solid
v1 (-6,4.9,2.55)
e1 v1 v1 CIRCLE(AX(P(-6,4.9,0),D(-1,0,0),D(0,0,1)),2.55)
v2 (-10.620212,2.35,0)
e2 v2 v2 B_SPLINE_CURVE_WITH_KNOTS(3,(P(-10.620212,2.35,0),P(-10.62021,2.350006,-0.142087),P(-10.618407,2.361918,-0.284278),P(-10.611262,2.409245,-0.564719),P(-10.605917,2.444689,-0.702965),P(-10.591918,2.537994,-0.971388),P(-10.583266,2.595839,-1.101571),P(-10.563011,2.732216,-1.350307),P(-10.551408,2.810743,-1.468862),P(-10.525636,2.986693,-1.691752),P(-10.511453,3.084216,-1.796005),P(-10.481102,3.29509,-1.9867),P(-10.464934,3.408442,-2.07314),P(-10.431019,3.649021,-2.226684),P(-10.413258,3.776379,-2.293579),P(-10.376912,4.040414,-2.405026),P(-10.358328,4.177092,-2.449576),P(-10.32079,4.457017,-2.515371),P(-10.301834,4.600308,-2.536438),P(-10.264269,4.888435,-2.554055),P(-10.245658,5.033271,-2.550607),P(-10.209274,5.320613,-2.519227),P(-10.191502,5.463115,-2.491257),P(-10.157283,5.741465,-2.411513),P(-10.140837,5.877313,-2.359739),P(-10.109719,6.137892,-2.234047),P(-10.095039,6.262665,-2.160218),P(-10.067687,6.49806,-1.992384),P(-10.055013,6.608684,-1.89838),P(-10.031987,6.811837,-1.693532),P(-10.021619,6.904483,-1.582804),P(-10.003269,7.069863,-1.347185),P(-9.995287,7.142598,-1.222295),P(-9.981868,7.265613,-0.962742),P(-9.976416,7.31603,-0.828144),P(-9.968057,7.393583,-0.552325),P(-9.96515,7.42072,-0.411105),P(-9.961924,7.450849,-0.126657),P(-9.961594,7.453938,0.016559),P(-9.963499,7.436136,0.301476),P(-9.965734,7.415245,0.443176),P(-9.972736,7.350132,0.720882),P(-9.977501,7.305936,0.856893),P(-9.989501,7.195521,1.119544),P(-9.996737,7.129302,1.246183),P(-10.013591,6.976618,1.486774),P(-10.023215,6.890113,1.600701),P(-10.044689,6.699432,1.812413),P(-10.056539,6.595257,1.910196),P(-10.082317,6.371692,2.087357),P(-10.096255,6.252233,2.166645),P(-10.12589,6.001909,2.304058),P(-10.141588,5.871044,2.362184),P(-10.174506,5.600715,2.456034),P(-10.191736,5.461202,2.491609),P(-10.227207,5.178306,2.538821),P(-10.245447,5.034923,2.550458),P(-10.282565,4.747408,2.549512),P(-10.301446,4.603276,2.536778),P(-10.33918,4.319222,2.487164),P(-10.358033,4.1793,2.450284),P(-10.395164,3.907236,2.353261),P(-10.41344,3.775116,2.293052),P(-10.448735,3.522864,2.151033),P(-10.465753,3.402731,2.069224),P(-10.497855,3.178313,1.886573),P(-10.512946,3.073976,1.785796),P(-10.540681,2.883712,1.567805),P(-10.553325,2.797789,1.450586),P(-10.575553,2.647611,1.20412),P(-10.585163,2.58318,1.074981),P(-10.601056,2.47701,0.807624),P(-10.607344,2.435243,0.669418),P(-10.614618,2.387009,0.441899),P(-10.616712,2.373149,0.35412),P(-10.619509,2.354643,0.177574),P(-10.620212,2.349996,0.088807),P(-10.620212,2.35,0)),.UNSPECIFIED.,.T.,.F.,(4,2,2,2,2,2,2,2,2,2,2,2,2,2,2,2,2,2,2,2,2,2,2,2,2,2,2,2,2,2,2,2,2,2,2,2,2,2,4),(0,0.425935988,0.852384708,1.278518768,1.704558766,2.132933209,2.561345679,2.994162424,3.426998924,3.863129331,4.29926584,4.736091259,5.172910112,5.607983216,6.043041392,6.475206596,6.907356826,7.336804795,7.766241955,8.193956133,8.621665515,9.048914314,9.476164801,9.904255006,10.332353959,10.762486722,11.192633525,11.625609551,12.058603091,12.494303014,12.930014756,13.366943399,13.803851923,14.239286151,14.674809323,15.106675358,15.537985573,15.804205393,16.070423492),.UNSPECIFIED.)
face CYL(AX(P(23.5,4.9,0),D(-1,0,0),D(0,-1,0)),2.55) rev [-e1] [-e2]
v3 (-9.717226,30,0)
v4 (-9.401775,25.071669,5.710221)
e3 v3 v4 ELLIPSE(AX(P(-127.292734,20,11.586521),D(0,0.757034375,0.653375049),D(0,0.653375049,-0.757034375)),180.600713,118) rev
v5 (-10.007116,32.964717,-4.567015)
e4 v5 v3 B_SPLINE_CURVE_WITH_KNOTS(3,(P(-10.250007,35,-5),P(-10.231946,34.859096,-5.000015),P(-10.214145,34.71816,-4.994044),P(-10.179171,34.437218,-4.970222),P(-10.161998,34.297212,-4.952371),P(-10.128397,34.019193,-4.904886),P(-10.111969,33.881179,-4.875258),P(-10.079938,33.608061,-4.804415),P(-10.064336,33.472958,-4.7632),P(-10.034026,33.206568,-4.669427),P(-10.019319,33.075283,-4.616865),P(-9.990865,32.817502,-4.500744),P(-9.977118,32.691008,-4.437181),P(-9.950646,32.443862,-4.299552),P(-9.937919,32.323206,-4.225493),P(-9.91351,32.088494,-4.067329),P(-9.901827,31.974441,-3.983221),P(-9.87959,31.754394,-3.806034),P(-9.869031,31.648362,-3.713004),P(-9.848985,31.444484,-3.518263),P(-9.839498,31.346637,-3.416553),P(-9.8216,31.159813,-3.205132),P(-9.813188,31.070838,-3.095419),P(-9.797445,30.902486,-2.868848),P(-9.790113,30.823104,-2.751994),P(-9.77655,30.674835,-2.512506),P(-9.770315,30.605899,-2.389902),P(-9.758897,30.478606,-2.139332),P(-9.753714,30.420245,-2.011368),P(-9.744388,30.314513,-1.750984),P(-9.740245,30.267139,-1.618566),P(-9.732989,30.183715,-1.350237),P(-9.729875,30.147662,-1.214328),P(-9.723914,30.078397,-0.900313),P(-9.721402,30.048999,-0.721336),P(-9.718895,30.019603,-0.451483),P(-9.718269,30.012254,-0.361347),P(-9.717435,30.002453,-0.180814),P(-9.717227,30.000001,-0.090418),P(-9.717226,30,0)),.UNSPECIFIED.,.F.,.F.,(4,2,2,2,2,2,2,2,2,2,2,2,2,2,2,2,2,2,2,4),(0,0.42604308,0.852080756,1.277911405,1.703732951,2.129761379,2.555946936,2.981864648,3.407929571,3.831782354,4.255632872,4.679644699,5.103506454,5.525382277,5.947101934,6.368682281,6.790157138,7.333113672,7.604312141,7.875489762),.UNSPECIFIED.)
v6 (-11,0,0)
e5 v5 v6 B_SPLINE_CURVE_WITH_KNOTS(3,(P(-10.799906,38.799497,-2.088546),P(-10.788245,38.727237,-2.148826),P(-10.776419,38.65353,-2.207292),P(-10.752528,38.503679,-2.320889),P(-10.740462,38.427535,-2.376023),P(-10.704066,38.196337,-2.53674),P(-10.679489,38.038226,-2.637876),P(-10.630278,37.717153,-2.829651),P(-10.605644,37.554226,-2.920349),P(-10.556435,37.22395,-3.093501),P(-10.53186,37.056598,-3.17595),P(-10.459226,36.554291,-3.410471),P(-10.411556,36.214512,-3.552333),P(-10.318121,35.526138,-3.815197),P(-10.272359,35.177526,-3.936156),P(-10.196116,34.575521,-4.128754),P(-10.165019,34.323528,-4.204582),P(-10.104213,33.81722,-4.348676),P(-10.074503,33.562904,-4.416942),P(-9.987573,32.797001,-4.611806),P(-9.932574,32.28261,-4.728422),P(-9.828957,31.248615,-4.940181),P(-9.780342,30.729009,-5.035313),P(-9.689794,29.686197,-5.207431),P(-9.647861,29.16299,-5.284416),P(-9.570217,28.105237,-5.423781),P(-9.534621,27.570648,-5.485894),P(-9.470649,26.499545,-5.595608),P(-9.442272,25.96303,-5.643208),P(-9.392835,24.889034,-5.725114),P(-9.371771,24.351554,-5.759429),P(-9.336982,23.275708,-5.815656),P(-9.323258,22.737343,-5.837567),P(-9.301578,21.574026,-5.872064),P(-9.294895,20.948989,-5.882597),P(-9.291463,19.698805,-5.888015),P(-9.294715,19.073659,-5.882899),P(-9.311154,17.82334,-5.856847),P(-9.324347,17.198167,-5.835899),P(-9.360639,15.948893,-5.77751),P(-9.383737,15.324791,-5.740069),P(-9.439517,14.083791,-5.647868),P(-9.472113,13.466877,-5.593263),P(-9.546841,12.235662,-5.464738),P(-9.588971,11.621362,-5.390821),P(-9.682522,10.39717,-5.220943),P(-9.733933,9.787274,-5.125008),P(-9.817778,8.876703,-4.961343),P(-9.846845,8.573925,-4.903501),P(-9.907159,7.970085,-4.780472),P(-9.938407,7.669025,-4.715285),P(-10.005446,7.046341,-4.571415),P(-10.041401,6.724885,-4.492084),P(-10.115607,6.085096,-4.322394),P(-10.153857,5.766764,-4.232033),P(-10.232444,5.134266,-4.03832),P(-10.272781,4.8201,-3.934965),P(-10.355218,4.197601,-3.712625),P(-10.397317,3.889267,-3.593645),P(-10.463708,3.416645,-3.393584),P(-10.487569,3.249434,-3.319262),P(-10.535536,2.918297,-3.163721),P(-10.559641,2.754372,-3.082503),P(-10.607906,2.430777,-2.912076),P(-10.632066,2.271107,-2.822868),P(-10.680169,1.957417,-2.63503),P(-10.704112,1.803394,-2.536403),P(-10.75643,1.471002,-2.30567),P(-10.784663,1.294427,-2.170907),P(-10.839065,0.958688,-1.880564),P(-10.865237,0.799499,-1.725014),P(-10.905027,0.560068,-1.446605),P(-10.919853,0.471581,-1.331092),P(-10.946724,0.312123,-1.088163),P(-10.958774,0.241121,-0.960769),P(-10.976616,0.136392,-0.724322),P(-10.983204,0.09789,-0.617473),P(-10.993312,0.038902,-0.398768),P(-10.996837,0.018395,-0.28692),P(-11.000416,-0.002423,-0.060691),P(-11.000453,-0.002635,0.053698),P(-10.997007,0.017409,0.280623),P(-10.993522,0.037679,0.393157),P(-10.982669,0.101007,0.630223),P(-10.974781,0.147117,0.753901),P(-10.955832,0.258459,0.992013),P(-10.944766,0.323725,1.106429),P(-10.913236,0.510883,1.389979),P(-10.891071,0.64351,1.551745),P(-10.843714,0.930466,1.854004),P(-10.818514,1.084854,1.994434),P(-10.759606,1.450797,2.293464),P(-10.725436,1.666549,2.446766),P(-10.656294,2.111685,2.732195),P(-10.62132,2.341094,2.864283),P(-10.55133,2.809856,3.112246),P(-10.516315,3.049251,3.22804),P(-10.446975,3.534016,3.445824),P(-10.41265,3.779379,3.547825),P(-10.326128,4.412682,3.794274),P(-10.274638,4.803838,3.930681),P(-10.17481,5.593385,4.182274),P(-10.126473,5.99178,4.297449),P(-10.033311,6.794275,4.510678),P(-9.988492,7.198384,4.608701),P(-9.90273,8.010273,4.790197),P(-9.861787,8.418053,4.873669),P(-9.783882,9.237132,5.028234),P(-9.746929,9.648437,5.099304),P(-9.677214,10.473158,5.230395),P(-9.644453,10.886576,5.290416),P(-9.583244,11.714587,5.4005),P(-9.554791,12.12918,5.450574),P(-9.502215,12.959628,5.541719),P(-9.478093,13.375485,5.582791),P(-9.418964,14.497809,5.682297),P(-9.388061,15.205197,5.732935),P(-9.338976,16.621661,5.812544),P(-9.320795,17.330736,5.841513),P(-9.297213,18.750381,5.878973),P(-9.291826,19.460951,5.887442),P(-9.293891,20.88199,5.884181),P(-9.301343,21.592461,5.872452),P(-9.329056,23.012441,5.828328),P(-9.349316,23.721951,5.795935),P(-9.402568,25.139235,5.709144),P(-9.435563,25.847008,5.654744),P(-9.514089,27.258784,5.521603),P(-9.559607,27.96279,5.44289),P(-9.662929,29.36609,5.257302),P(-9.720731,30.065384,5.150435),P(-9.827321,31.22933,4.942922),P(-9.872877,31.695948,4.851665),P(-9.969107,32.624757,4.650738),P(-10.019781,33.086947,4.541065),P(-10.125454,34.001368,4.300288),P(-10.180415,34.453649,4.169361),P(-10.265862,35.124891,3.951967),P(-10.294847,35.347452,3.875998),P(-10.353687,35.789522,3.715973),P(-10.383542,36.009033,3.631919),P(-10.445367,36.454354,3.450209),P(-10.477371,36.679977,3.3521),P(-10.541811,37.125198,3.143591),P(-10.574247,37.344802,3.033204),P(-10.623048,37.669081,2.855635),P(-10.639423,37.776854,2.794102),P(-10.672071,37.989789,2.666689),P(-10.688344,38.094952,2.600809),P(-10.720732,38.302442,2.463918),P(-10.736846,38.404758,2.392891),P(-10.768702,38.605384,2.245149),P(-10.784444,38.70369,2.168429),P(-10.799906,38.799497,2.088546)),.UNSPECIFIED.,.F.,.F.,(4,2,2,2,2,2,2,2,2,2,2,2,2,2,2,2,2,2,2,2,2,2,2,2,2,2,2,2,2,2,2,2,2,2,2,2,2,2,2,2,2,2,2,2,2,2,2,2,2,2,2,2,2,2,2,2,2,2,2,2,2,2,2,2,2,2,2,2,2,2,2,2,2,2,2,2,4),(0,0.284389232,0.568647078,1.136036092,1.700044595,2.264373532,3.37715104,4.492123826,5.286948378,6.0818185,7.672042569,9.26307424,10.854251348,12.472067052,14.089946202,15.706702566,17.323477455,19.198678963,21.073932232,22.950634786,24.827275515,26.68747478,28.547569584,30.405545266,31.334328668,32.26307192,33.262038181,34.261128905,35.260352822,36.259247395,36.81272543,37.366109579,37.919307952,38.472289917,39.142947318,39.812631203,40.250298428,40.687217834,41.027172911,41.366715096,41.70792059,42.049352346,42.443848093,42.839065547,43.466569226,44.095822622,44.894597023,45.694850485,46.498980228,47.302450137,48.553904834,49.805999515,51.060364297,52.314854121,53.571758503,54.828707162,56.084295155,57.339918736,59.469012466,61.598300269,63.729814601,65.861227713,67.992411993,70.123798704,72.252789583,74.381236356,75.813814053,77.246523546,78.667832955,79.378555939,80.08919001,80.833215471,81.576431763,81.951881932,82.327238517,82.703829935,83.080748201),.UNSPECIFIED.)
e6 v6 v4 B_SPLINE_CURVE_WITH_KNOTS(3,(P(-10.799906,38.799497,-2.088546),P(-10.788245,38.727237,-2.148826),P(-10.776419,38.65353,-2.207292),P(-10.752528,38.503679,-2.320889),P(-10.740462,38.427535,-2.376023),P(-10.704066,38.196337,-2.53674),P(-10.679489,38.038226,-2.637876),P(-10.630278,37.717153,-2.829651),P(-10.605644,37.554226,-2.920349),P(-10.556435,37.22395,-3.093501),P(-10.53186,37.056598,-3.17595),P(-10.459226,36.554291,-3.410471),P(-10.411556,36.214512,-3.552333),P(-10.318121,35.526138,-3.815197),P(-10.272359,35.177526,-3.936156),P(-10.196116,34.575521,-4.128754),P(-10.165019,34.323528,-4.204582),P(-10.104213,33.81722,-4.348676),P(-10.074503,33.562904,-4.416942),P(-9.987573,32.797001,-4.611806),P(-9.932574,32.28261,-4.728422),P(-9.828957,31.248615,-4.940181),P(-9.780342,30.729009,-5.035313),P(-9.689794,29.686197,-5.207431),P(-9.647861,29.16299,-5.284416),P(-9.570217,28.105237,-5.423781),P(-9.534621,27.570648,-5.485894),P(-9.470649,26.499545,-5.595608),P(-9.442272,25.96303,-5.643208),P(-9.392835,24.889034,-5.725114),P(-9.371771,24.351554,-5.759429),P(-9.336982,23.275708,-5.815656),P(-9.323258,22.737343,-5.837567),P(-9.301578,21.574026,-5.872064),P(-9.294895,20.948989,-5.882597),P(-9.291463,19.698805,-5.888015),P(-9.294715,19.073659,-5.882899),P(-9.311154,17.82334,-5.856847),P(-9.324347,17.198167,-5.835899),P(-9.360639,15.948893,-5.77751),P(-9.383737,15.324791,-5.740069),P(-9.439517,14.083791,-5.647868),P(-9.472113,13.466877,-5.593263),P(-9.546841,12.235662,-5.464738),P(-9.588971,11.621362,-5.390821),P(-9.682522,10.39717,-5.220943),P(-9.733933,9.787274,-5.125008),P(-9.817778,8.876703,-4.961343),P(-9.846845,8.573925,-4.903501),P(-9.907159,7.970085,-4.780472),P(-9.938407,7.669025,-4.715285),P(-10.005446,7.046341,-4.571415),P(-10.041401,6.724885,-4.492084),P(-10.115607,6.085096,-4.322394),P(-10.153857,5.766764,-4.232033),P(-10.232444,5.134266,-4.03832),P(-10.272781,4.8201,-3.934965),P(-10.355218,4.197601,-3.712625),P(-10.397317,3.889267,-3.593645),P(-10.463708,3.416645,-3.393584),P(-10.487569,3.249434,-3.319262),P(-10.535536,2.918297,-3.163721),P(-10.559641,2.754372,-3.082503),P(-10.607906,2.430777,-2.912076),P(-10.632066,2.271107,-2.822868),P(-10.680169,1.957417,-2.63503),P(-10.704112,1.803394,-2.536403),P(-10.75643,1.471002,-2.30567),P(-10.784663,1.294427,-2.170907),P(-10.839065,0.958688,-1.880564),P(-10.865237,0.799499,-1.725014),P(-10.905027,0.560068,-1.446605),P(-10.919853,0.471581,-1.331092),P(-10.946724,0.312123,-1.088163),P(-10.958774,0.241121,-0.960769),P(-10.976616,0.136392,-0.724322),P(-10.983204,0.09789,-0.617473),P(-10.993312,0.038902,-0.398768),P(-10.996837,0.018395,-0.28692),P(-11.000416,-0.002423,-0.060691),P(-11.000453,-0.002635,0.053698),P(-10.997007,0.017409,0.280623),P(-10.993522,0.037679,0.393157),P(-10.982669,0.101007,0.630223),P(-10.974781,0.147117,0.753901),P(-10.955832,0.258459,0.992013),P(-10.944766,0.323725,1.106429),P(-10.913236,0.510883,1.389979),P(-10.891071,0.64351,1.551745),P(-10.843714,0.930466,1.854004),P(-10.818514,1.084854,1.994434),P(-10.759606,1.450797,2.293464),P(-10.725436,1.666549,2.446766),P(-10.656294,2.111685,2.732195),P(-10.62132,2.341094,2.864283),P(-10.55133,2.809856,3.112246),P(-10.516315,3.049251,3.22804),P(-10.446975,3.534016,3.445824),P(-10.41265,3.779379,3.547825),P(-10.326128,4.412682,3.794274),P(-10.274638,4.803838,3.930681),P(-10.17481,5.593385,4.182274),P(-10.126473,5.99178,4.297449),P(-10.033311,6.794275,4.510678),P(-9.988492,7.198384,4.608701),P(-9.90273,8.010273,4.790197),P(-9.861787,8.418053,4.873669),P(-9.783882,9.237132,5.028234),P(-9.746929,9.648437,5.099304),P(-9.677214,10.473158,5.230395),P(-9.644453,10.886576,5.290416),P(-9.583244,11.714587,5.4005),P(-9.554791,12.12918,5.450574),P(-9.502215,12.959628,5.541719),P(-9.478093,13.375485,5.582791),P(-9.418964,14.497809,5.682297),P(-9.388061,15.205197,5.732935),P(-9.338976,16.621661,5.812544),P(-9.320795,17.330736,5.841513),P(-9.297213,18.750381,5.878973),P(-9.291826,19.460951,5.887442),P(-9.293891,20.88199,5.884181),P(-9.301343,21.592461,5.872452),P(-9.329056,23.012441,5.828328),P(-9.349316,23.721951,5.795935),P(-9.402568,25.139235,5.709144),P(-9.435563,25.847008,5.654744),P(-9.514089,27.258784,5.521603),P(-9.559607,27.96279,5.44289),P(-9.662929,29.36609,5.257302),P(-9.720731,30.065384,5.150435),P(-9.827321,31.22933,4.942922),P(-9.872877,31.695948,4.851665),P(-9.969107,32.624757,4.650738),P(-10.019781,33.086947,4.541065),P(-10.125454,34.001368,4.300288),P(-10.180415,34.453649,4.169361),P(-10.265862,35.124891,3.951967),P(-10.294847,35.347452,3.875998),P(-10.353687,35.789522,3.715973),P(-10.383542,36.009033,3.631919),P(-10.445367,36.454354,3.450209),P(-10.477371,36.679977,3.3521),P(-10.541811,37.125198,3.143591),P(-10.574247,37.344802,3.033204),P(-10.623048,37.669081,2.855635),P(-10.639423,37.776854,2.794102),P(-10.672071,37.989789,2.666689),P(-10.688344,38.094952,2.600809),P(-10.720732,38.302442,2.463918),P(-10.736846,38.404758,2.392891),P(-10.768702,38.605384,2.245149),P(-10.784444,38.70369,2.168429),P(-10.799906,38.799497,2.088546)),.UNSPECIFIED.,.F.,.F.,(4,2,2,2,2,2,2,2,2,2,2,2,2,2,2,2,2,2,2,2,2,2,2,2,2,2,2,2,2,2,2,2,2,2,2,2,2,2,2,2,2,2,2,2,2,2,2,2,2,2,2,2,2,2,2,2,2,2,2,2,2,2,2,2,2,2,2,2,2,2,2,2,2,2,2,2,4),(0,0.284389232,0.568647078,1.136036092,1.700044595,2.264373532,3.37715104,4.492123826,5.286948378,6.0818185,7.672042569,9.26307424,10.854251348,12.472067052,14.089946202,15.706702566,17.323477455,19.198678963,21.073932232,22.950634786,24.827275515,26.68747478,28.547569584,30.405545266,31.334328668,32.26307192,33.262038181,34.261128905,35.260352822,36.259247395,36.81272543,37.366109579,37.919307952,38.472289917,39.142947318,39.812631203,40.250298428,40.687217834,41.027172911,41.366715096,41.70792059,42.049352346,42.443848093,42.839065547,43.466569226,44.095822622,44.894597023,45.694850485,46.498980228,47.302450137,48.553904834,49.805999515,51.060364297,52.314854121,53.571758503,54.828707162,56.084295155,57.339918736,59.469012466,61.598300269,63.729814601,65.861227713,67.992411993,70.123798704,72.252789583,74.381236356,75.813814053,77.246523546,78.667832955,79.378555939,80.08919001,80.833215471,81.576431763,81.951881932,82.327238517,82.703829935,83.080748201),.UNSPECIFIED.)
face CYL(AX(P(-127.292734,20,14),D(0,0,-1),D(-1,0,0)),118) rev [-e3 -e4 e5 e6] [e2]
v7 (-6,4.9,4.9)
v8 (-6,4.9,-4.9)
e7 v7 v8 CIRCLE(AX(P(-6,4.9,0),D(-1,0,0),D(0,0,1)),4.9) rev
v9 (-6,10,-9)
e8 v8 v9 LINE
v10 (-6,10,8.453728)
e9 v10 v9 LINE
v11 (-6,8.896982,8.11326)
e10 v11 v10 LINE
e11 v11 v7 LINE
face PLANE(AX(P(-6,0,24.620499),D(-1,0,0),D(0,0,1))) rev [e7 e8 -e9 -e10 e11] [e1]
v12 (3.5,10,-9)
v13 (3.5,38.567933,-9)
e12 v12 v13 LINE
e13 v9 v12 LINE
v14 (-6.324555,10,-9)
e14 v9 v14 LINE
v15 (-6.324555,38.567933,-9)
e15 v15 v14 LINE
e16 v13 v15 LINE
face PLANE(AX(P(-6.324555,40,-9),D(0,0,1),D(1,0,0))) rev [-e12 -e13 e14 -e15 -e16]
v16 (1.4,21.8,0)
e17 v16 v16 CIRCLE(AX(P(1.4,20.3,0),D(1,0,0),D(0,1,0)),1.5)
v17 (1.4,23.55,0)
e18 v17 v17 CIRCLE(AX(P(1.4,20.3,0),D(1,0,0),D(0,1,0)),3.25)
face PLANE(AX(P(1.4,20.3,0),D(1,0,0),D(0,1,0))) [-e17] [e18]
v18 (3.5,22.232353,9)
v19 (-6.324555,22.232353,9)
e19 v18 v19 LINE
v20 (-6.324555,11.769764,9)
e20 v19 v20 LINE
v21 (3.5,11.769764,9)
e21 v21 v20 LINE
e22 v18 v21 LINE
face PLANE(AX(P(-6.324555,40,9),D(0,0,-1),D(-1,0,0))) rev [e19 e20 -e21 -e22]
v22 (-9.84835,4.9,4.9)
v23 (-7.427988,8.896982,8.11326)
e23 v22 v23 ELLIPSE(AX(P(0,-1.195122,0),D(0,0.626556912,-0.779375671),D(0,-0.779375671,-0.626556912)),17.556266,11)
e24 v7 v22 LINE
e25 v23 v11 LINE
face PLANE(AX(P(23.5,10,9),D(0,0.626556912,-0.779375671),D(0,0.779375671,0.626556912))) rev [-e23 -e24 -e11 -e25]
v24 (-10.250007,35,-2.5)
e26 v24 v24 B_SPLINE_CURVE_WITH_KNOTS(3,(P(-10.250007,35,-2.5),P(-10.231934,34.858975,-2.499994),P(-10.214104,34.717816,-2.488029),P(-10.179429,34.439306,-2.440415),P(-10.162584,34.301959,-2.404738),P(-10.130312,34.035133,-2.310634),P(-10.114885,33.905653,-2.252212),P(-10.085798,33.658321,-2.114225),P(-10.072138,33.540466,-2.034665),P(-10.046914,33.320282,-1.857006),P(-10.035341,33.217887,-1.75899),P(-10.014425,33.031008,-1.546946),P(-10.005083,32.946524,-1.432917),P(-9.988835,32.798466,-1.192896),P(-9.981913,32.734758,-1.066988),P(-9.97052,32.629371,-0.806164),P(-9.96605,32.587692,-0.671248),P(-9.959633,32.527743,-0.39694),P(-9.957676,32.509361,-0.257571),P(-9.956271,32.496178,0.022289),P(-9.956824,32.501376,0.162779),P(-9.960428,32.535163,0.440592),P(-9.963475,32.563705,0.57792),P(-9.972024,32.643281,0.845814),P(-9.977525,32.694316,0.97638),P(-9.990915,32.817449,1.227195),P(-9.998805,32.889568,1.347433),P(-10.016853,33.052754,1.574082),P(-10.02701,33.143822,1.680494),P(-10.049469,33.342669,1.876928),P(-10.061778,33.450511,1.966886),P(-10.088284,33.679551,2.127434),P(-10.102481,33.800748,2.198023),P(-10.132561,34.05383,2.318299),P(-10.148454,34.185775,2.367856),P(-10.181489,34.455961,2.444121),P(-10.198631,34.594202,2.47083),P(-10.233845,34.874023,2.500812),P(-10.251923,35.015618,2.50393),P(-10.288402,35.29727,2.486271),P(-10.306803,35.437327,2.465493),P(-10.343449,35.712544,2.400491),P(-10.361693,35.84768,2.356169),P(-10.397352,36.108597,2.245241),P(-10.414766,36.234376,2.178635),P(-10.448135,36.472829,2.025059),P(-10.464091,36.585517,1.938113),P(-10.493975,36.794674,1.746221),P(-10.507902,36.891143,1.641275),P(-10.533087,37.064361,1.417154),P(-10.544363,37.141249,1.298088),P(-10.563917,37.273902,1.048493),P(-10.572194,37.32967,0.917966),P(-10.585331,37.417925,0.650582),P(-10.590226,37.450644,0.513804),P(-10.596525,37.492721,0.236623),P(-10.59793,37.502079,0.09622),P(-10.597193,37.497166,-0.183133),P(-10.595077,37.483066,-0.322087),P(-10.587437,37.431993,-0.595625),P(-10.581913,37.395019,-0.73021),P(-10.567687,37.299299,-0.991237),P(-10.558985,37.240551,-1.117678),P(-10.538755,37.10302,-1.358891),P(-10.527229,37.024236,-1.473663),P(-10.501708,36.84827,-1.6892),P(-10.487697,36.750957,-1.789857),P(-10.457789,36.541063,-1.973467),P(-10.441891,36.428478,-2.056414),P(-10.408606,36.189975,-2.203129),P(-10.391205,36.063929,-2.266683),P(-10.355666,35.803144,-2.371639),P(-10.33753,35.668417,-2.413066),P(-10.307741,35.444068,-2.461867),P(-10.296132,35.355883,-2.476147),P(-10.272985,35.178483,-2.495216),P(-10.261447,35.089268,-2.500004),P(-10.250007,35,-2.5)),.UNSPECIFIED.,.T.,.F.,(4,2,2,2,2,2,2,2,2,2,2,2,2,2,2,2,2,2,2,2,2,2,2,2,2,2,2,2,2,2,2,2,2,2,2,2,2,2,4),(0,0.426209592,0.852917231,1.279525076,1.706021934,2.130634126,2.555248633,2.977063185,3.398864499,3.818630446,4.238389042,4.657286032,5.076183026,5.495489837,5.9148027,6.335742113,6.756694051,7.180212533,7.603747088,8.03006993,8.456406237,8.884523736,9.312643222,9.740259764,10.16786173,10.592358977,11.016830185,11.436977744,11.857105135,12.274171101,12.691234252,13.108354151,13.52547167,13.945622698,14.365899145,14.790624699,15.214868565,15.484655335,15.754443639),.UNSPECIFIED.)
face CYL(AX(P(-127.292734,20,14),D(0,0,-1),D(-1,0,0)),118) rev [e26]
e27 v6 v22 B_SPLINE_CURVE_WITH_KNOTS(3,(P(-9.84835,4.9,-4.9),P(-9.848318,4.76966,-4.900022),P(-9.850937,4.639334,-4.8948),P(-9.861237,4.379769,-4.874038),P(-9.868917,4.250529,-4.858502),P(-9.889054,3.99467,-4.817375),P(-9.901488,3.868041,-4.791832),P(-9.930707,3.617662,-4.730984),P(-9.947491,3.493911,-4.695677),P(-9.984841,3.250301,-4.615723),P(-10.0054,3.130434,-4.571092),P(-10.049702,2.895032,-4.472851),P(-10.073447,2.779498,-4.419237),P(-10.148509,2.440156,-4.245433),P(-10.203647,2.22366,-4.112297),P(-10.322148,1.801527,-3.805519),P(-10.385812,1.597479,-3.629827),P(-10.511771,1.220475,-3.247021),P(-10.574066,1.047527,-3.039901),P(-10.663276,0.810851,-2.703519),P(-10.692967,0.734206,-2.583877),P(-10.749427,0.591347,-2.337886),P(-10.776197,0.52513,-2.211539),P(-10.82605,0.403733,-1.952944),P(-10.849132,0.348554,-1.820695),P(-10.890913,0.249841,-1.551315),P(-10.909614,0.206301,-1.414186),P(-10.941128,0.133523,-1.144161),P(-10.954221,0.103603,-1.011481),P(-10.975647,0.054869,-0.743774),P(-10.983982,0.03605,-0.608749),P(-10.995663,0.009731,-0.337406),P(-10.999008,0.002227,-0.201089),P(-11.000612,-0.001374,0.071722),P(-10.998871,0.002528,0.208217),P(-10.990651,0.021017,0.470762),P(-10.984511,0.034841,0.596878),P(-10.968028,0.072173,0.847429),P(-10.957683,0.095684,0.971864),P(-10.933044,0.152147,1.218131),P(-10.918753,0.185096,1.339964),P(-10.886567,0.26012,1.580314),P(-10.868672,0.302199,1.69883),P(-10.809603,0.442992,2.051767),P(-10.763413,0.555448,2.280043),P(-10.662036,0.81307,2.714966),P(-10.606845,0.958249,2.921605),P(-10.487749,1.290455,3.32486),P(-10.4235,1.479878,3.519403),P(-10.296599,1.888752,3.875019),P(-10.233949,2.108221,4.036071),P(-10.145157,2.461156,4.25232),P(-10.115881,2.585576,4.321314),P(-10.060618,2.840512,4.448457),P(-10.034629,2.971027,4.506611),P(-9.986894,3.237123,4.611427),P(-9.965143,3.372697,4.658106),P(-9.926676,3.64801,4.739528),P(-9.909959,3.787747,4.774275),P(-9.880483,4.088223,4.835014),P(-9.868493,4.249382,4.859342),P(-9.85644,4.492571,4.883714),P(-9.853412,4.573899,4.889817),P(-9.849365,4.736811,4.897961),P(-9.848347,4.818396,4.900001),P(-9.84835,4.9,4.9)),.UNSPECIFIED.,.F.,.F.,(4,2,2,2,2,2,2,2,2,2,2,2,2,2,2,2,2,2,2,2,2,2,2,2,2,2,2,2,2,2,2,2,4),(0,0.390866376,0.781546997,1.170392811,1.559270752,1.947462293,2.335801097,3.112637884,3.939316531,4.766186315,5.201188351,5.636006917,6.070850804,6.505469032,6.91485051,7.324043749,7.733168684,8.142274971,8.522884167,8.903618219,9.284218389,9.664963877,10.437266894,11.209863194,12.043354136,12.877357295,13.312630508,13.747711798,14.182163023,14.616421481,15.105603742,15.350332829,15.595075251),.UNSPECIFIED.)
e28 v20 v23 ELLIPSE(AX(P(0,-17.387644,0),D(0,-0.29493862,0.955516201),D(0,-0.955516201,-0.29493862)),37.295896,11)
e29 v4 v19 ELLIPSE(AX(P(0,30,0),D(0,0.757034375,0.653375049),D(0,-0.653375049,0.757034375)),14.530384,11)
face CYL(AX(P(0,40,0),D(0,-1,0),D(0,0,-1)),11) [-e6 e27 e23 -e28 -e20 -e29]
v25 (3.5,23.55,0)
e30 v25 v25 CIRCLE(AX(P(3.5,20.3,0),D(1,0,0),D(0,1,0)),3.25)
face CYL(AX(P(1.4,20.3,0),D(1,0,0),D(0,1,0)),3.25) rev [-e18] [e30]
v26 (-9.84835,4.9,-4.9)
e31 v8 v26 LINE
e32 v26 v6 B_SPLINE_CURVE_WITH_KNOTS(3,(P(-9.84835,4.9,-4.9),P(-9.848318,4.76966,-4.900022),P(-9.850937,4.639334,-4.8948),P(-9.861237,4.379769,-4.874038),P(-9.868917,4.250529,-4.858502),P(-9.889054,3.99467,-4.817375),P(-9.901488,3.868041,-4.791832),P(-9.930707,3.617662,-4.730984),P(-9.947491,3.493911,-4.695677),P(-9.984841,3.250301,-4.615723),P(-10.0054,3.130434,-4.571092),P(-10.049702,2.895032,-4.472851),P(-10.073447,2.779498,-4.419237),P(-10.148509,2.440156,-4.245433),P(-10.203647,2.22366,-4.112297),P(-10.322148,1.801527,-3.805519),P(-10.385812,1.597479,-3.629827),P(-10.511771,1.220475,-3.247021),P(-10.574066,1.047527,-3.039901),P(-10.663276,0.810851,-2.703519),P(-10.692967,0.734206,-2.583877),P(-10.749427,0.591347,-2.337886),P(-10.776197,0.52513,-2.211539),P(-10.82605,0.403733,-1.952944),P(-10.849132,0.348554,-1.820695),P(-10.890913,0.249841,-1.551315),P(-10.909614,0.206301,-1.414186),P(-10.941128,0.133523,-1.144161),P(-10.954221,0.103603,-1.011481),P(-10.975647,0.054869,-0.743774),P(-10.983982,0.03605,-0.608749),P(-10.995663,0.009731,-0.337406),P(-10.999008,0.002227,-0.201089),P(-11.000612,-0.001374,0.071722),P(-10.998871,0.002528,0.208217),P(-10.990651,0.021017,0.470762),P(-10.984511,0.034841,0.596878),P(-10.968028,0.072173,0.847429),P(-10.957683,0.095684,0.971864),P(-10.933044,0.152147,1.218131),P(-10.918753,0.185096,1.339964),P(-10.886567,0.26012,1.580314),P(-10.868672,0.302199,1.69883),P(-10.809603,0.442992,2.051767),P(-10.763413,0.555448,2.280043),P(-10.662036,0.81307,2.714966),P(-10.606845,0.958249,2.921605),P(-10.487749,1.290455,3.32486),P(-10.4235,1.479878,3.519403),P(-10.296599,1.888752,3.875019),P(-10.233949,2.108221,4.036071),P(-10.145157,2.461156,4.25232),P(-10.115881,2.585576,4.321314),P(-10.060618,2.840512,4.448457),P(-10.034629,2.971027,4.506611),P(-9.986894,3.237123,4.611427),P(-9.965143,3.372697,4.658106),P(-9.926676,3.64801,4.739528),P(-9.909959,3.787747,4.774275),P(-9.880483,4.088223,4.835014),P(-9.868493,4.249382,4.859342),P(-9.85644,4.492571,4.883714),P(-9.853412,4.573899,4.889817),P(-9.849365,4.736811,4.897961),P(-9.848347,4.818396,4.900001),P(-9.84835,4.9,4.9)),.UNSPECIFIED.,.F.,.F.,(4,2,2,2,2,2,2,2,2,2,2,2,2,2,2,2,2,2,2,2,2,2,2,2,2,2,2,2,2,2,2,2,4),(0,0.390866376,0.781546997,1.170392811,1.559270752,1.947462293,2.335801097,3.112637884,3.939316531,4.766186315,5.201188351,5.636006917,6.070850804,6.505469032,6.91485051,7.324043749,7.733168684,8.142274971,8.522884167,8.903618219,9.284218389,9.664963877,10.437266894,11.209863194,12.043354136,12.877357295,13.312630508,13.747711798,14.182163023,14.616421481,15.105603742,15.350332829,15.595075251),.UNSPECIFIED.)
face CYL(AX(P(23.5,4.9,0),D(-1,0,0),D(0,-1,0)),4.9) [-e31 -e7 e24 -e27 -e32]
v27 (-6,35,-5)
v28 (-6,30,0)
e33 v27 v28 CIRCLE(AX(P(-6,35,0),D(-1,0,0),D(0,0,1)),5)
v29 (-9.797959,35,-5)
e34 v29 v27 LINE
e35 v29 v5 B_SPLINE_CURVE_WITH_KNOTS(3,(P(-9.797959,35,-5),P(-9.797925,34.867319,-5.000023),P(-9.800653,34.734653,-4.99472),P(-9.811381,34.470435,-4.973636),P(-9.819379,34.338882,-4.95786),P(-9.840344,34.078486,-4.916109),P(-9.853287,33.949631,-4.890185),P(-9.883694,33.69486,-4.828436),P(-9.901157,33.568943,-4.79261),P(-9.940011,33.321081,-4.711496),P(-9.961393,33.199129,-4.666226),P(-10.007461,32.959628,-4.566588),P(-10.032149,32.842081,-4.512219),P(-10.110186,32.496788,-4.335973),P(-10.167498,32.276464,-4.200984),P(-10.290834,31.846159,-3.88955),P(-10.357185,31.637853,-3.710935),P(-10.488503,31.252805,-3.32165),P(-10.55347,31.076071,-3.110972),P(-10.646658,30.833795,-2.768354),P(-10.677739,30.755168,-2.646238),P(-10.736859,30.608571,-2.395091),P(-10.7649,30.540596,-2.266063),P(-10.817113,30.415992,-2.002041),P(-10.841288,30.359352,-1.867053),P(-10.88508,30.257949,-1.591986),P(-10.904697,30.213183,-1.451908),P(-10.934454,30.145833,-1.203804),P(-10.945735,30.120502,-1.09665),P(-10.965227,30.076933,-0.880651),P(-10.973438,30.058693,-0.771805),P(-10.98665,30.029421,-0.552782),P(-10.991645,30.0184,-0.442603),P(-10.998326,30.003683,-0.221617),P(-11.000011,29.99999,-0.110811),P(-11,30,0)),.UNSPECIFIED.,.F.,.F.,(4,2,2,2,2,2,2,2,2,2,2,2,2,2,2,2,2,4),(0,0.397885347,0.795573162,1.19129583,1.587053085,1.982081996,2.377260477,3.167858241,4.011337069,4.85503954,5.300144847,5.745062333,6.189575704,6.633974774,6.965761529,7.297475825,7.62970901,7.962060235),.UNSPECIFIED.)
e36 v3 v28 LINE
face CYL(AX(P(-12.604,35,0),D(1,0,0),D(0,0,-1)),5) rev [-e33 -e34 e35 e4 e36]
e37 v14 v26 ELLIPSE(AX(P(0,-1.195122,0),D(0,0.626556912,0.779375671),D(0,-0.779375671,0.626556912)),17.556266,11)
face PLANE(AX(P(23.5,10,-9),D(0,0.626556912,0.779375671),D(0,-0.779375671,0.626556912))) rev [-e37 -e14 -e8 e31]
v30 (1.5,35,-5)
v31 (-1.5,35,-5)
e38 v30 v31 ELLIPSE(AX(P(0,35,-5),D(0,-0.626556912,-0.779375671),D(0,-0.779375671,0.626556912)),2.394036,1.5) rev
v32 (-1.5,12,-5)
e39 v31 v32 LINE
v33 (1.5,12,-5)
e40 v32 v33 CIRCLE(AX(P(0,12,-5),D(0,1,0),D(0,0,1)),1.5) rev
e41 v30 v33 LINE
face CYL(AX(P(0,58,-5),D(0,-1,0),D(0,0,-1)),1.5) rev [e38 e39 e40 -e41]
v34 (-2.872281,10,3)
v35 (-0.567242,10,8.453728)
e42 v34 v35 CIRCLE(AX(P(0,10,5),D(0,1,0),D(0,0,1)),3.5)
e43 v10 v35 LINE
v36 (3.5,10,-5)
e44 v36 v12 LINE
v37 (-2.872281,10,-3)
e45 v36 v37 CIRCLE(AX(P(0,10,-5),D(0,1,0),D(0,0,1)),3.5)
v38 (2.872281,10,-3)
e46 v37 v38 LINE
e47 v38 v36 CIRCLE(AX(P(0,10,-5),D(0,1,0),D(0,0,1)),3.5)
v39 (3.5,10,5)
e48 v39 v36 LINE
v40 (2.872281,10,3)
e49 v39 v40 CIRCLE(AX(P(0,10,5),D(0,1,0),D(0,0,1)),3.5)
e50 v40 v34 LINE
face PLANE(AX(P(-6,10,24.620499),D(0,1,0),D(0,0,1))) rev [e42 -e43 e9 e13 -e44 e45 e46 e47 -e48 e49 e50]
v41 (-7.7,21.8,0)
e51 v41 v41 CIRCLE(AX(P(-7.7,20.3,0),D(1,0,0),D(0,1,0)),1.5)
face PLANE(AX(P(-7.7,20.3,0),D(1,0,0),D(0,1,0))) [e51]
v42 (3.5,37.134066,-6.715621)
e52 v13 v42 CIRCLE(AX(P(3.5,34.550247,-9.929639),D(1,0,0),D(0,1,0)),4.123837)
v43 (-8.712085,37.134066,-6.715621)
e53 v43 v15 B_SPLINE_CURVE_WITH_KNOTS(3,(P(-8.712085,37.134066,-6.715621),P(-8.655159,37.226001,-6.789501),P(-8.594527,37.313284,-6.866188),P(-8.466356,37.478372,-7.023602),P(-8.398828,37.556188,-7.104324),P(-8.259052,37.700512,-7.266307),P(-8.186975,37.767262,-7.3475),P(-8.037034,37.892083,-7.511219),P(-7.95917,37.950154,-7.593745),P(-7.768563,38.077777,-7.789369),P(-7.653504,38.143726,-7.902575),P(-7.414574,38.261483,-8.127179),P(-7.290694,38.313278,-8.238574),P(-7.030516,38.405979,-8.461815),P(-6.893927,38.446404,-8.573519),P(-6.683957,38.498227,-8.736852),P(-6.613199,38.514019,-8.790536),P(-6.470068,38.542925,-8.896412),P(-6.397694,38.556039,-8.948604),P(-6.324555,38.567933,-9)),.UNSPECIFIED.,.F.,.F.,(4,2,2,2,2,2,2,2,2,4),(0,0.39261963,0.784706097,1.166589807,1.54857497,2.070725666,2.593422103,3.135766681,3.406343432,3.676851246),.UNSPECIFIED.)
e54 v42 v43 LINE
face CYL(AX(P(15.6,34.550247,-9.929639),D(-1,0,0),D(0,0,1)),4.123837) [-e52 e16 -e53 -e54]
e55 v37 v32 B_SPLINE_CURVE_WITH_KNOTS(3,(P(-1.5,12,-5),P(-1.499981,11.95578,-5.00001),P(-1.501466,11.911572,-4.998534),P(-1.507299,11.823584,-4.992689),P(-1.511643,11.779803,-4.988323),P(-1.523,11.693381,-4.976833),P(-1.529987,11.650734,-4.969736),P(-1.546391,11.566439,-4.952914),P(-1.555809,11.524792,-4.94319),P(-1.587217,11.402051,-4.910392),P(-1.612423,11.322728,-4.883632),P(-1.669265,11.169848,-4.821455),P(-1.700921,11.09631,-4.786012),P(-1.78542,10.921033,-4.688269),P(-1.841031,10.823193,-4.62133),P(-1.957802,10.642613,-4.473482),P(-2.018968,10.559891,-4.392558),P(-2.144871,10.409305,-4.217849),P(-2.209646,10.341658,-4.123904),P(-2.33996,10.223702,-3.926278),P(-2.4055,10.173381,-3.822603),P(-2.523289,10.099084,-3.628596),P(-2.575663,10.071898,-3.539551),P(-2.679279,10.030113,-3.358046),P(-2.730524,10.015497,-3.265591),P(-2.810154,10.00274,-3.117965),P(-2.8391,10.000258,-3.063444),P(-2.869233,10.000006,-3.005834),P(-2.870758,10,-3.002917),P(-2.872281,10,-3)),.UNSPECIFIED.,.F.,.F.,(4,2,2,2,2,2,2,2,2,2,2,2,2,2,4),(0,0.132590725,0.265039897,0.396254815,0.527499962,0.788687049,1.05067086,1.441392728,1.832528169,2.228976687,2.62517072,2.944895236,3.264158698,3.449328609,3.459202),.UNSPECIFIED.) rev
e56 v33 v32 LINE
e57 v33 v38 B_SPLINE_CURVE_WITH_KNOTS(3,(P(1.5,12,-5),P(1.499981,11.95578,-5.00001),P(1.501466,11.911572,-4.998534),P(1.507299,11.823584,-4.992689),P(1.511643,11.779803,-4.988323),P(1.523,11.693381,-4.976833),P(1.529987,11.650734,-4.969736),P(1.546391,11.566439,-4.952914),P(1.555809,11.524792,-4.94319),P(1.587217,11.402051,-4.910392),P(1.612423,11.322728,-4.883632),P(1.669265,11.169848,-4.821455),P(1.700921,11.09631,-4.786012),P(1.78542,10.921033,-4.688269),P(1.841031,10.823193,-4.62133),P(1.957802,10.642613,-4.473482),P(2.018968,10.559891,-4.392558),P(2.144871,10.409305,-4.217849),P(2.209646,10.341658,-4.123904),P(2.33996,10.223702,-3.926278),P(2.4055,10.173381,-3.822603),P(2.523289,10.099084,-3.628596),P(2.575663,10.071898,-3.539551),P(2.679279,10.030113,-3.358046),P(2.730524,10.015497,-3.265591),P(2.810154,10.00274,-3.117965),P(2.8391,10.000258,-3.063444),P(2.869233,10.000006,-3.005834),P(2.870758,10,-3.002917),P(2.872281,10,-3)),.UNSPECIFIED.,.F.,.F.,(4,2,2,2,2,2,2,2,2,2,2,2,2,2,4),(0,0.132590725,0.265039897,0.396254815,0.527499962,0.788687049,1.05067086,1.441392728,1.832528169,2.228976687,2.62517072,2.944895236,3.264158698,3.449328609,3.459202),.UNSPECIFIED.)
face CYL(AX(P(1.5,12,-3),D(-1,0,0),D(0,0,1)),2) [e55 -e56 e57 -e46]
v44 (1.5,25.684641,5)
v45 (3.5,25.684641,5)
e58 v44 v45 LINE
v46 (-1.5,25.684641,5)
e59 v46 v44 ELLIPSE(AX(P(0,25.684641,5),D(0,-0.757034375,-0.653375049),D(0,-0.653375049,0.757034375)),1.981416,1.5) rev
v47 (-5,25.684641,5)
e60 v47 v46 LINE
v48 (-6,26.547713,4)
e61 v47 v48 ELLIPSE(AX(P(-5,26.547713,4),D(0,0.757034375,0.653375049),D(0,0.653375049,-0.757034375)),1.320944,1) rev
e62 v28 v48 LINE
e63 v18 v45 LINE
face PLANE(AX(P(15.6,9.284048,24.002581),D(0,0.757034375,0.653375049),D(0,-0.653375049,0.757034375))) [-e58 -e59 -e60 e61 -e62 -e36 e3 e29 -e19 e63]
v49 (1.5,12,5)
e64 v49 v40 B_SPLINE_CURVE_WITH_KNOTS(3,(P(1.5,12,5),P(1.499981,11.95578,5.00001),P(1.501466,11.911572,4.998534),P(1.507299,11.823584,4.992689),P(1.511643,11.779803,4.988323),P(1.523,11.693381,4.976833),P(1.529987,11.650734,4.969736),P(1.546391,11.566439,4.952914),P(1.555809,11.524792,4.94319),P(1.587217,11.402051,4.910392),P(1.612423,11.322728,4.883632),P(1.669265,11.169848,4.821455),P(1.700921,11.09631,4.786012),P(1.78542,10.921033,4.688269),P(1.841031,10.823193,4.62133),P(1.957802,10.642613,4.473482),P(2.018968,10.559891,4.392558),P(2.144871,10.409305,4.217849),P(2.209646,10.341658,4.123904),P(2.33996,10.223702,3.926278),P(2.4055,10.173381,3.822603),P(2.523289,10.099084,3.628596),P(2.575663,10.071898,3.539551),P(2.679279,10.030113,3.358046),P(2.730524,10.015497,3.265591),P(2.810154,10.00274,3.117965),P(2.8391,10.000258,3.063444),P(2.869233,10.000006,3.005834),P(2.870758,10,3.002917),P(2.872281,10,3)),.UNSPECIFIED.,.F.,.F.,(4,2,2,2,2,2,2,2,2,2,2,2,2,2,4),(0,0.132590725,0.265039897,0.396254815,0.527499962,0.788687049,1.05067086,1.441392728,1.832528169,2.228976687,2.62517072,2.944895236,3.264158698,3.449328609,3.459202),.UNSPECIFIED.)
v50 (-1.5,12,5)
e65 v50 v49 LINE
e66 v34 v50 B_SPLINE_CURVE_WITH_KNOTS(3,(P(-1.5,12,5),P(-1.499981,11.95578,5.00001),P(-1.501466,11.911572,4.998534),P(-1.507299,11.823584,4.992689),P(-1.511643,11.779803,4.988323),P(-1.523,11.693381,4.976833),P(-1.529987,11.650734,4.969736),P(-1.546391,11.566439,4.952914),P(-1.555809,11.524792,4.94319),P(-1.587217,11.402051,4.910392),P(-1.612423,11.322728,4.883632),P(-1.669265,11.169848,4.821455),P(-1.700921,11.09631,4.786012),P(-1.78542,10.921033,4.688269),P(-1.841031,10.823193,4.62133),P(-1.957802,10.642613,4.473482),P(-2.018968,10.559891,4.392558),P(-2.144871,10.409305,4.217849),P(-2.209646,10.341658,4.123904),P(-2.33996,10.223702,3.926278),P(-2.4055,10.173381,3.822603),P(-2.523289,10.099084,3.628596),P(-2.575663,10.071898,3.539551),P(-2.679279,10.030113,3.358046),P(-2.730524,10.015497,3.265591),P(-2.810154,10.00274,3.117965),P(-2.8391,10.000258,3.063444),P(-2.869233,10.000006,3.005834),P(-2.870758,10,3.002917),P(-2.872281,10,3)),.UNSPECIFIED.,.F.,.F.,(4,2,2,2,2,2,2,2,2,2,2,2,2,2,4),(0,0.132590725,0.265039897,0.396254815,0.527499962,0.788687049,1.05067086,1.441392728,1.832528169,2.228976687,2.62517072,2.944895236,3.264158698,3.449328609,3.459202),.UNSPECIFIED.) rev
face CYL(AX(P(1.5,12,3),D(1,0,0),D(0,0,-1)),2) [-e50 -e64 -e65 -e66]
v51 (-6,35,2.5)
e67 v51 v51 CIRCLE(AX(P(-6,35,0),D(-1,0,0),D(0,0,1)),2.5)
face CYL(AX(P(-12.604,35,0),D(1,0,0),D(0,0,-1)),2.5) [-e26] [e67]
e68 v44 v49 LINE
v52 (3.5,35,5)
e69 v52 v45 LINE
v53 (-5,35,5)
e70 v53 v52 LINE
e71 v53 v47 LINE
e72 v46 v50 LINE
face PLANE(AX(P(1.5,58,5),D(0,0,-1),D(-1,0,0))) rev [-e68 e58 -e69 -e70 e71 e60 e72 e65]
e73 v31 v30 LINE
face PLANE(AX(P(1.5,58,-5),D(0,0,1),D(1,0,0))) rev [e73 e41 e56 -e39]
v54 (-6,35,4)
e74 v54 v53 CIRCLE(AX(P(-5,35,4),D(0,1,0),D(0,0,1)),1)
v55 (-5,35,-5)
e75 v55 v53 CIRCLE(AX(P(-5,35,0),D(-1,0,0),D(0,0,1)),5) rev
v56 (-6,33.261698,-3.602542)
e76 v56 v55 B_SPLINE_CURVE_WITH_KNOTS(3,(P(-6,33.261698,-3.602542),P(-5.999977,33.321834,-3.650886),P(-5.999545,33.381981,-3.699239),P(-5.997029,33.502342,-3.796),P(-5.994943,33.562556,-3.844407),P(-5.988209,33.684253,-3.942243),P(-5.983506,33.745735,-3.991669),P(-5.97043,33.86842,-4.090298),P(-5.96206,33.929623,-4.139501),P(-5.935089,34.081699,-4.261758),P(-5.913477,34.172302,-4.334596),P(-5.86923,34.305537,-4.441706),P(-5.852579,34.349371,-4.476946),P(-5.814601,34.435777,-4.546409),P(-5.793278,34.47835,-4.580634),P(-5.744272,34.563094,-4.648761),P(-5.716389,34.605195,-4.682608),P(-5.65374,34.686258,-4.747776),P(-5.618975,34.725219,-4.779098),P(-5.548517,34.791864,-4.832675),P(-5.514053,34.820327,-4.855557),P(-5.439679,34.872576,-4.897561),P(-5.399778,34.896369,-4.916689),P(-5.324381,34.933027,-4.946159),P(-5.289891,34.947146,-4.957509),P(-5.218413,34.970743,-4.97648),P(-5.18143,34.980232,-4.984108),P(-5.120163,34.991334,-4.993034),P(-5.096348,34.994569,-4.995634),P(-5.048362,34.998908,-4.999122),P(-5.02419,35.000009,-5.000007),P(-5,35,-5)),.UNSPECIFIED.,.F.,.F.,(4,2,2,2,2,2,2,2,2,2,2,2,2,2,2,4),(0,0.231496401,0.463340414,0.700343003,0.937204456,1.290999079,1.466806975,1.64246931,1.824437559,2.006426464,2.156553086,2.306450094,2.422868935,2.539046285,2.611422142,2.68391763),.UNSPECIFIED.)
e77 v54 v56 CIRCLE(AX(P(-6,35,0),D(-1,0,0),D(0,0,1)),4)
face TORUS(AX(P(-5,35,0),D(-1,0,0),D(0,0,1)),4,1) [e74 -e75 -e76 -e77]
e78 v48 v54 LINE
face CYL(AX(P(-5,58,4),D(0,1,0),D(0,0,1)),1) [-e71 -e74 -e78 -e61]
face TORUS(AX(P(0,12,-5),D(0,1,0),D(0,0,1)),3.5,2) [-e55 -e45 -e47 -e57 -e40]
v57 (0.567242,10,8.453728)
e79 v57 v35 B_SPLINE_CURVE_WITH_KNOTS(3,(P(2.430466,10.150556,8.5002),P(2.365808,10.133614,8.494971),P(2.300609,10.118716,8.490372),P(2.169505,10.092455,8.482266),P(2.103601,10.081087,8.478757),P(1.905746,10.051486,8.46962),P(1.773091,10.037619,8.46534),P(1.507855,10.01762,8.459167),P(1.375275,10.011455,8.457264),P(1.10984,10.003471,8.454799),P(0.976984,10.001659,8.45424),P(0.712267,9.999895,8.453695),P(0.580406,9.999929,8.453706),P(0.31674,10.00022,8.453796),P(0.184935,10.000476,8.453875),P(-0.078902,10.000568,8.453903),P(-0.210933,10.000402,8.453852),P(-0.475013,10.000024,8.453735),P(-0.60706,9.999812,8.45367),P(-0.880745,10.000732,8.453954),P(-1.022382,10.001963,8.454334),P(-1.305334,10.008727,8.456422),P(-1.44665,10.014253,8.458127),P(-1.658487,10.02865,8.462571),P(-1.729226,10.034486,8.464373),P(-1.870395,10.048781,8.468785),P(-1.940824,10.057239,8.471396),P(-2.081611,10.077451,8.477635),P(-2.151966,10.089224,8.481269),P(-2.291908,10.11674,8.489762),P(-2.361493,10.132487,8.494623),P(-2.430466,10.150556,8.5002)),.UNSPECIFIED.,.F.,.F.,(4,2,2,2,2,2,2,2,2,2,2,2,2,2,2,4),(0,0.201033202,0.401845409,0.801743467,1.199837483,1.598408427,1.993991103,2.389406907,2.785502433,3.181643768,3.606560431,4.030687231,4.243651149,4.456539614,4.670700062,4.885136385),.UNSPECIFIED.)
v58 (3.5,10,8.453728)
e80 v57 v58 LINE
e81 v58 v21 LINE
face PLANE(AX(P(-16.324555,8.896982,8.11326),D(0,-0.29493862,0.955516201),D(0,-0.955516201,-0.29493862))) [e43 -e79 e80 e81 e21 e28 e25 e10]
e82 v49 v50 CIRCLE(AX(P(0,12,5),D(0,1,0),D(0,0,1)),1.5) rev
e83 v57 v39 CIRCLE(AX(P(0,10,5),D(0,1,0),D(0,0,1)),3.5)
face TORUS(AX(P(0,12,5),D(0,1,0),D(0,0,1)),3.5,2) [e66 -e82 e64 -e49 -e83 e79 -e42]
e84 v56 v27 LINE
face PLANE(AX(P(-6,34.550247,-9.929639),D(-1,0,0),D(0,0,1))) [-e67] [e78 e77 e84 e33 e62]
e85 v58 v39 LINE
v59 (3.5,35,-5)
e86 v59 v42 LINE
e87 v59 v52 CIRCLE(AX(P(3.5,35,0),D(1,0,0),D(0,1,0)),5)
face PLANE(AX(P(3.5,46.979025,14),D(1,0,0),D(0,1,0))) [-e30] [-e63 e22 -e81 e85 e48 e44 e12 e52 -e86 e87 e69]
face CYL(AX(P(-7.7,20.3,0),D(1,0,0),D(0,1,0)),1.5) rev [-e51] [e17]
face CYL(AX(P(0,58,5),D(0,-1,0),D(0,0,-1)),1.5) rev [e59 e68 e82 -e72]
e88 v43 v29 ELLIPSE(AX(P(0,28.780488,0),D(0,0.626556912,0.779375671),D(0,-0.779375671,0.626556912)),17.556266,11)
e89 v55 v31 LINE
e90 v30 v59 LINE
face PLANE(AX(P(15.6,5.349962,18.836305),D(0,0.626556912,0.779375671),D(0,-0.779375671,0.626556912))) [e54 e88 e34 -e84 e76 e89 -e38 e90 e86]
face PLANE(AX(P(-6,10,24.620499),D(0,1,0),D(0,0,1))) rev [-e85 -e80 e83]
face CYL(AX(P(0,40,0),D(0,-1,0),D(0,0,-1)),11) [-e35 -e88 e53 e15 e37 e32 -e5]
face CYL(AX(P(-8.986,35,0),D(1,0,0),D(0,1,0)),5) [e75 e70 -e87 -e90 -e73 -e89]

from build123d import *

# Parameters (mm, degrees)
BOSS_EXTRUDE1_DEPTH      = 40
CUT_EXTRUDE1_DEPTH       = 58
CUT_EXTRUDE2_REACH       = 47.222
SKETCH3_W                = 12
SKETCH3_H                = 10
SKETCH4_R                = 2.55
CUT_EXTRUDE3_DEPTH       = 17.5
FILLET4_R                = 2
CUT_EXTRUDE5_START       = -12.324555
SKETCH6_R                = 2.5
CUT_EXTRUDE5_DEPTH       = 9.6
CUT_EXTRUDE6_START       = 6.279445
SKETCH6_3_R              = 2.5
CUT_EXTRUDE6_DEPTH       = 6.604
CUT_EXTRUDE7_START       = -14.986
CUT_EXTRUDE7_DEPTH       = 14.986
CUT_EXTRUDE14_DEPTH      = 10
CUT_EXTRUDE14_DEPTH_BACK = 20
FILLET3_R                = 1
CUT_EXTRUDE17_DEPTH      = 9
CUT_EXTRUDE17_DEPTH_BACK = 31
SKETCH19_W               = 18.14397799
SKETCH19_H               = 52.511082079
SKETCH20_R               = 3.25
CUT_EXTRUDE18_DEPTH      = 2.1
SKETCH21_R               = 1.5
CUT_EXTRUDE19_DEPTH      = 9.1
CUT_EXTRUDE20_DEPTH      = 14
CUT_EXTRUDE20_DEPTH_BACK = 14


with BuildPart() as part:
    # Sketch1 → Boss-Extrude1 (new body)
    with BuildSketch(Plane(origin=(0, 0, 0), x_dir=(1, 0, 0), z_dir=(0, 1, 0))):
        with BuildLine():
            Line((-6.32455532, 9), (6.32455532, 9))
            ThreePointArc((6.32455532, 9), (11, 0), (6.32455532, -9))
            Line((6.32455532, -9), (-6.32455532, -9))
            ThreePointArc((-6.32455532, -9), (-11, 0), (-6.32455532, 9))
        make_face()
    extrude(amount=BOSS_EXTRUDE1_DEPTH)

    # Sketch2 → Cut-Extrude1 (cut)
    with BuildSketch(Plane.XZ):
        with BuildLine():
            Line((1.5, 5), (-1.5, 5))
            ThreePointArc((-1.5, 5), (0, 6.5), (1.5, 5))
        make_face()
        with BuildLine():
            Line((1.5, -5), (-1.5, -5))
            ThreePointArc((-1.5, -5), (0, -6.5), (1.5, -5))
        make_face()
    extrude(amount=-CUT_EXTRUDE1_DEPTH, mode=Mode.SUBTRACT)

    # Cut-Extrude2: up to this face of the body (flat: up to its plane)
    cut_extrude2_end = Plane(part.part.faces().sort_by_distance((0, 20, 9))[0])
    # Sketch3 → Cut-Extrude2 (cut, up to the picked face)
    with BuildSketch(Plane(origin=(0, 0, -9), x_dir=(-1, 0, 0), z_dir=(0, 0, -1)), mode=Mode.PRIVATE) as cut_extrude2_sk1:
        with Locations((0, 5)):
            Rectangle(SKETCH3_W, SKETCH3_H)
    cut_extrude2_tool1 = split(extrude(cut_extrude2_sk1.sketch, amount=-CUT_EXTRUDE2_REACH, mode=Mode.PRIVATE), bisect_by=cut_extrude2_end, keep=Keep.BOTH, mode=Mode.PRIVATE)
    add(cut_extrude2_tool1.solids().sort_by(Axis((0, 5, -9), (0, 0, 1)))[0], mode=Mode.SUBTRACT)

    # Sketch4 → Cut-Extrude3 (cut, symmetric)
    with BuildSketch(Plane.ZY.offset(-6)):
        with Locations(Location((0, 4.9, 0), (0, 0, 270))):
            Circle(SKETCH4_R)
        with BuildLine():
            Line((-9, 10), (-4.9, 4.9))
            ThreePointArc((-4.9, 4.9), (0, 0), (4.9, 4.9))
            Line((4.9, 4.9), (9, 10))
            Line((9, 10), (12.043777938, -1.930413563))
            Line((12.043777938, -1.930413563), (-10.290438773, -1.930413563))
            Line((-10.290438773, -1.930413563), (-9, 10))
        make_face()
    extrude(amount=CUT_EXTRUDE3_DEPTH, both=True, mode=Mode.SUBTRACT)

    # Fillet4
    fillet4_edges = [part.edges().sort_by_distance(p)[0] for p in [
        (0, 10, 5),
        (0, 10, 6.5),
        (0, 10, -5),
        (0, 10, -6.5),
    ]]
    fillet(fillet4_edges, radius=FILLET4_R)

    # Sketch6 → Cut-Extrude5 (cut)
    with BuildSketch(Plane.ZY.offset(6.32455532).offset(CUT_EXTRUDE5_START)):
        with BuildLine():
            Line((9, 22.232353468), (0, 30))
            ThreePointArc((0, 30), (-3.535533906, 31.464466094), (-5, 35))
            Line((-5, 35), (-6.715621335, 37.134065563))
            ThreePointArc((-6.715621335, 37.134065563), (-7.737273484, 38.043034193), (-9, 38.567933069))
            Line((-9, 38.567933069), (-20.985236203, 70.297327945))
            Line((-20.985236203, 70.297327945), (29.827478779, 37.594689174))
            Line((29.827478779, 37.594689174), (9, 22.232353468))
        make_face()
        with Locations((0, 35)):
            Circle(SKETCH6_R, mode=Mode.SUBTRACT)
    extrude(amount=-CUT_EXTRUDE5_DEPTH, mode=Mode.SUBTRACT)

    # Sketch6<3> → Cut-Extrude6 (cut)
    with BuildSketch(Plane.ZY.offset(6.32455532).offset(CUT_EXTRUDE6_START)):
        with BuildLine():
            Line((9, 22.232353468), (0, 30))
            ThreePointArc((0, 30), (-3.535533906, 31.464466094), (-5, 35))
            Line((-5, 35), (-6.715621335, 37.134065563))
            ThreePointArc((-6.715621335, 37.134065563), (-7.737273484, 38.043034193), (-9, 38.567933069))
            Line((-9, 38.567933069), (-20.985236203, 70.297327945))
            Line((-20.985236203, 70.297327945), (29.827478779, 37.594689174))
            Line((29.827478779, 37.594689174), (9, 22.232353468))
        make_face()
        with Locations((0, 35)):
            Circle(SKETCH6_3_R, mode=Mode.SUBTRACT)
    extrude(amount=-CUT_EXTRUDE6_DEPTH, mode=Mode.SUBTRACT)

    # Sketch7 → Cut-Extrude7 (cut)
    with BuildSketch(Plane(origin=(6, 0, 0), x_dir=(0, 0, -1), z_dir=(1, 0, 0)).offset(CUT_EXTRUDE7_START)):
        with BuildLine():
            Line((5, 35), (6.715621335, 37.134065563))
            ThreePointArc((6.715621335, 37.134065563), (7.737273484, 38.043034193), (9, 38.567933069))
            Line((9, 38.567933069), (57.758012517, 25.684640815))
            Line((57.758012517, 25.684640815), (-30.579133969, 55.486762513))
            Line((-30.579133969, 55.486762513), (-9, 22.232353468))
            Line((-9, 22.232353468), (-5, 25.684640815))
            Line((-5, 25.684640815), (-5, 35))
            ThreePointArc((-5, 35), (0, 40), (5, 35))
        make_face()
    extrude(amount=CUT_EXTRUDE7_DEPTH, mode=Mode.SUBTRACT)

    # Sketch16 → Cut-Extrude14 (cut, two sides: drawn at the far end of the back side and taken through both)
    with BuildSketch(Plane.ZY.offset(6.32455532).offset(-CUT_EXTRUDE14_DEPTH_BACK)):
        Polygon((8.113259987, 8.896981935), (11.550119513, 20.031417135), (18.056002312, 15.695207893), (16.156055326, 2.281594324), align=None)
    extrude(amount=CUT_EXTRUDE14_DEPTH + CUT_EXTRUDE14_DEPTH_BACK, mode=Mode.SUBTRACT)

    # Fillet3
    # the kernel refuses this fillet: 1 mm, written as the material it takes off along each edge
    with BuildSketch(Plane(origin=(5.99999968, 23.184640014, 5), x_dir=(-1, 0, 0), z_dir=(0, 1, 0))) as fillet3_piece_1_section:
        with BuildLine():
            CenterArc((FILLET3_R, -FILLET3_R), FILLET3_R, 90, 90)
            Line((0, -FILLET3_R), (0, 0))
            Line((0, 0), (FILLET3_R, 0))
        make_face()
    fillet3_piece_1 = extrude(amount=11.815359986, mode=Mode.PRIVATE)
    fillet3_piece_1 = split(fillet3_piece_1, bisect_by=Plane(origin=(5.764976342, 27.542151825, 2.84779096), z_dir=(0, 0.7570343753275034, 0.653375048936288)), keep=Keep.TOP, mode=Mode.PRIVATE)
    add(fillet3_piece_1, mode=Mode.SUBTRACT)
    with BuildSketch(Plane(origin=(6, 35, 0), x_dir=(0, 0, 1), z_dir=(0, -1, 0))) as fillet3_piece_2_section:
        with BuildLine():
            CenterArc((4, 1.00000032), FILLET3_R, 270, 90)
            ThreePointArc((4, 3.2e-07), (4.5, 3.2e-07), (5, 0))
            Line((5, 0), (5, 1.00000032))
        make_face()
    fillet3_piece_2 = revolve(axis=Axis((6, 35, 0), (-1, 0, 0)), revolution_arc=208.693968336, mode=Mode.PRIVATE)
    fillet3_piece_2 = split(fillet3_piece_2, bisect_by=Plane(origin=(5.717618036, 35.865387036, -5.695703303), z_dir=(0, 0.6265569118246592, 0.7793756708062848)), keep=Keep.TOP, mode=Mode.PRIVATE)
    add(fillet3_piece_2, mode=Mode.SUBTRACT)
    with BuildSketch(Plane(origin=(-6.00000032, 35, 0), x_dir=(0, -0.48013104288571373, -0.8771967747646344), z_dir=(0, -0.8771967747646344, 0.48013104288571373))) as fillet3_piece_3_section:
        with BuildLine():
            CenterArc((5 - FILLET3_R, FILLET3_R), FILLET3_R, 270, 90)
            Line((5 - FILLET3_R, 0), (5, 0))
            Line((5, 0), (5, FILLET3_R))
        make_face()
    fillet3_piece_3 = revolve(axis=Axis((-6.00000032, 35, 0), (1, 0, 0)), revolution_arc=208.69396098, mode=Mode.PRIVATE)
    fillet3_piece_3 = split(fillet3_piece_3, bisect_by=Plane(origin=(-5.717618693, 35.865387047, -5.695703312), z_dir=(0, 0.6265569118246592, 0.7793756708062848)), keep=Keep.TOP, mode=Mode.PRIVATE)
    add(fillet3_piece_3, mode=Mode.SUBTRACT)
    with BuildSketch(Plane(origin=(-6.00000032, 35, 5), x_dir=(0, 0, -1), z_dir=(0, -1, 0))) as fillet3_piece_4_section:
        with BuildLine():
            CenterArc((FILLET3_R, FILLET3_R), FILLET3_R, 180, 90)
            Line((0, FILLET3_R), (0, 0))
            Line((0, 0), (FILLET3_R, 0))
        make_face()
    fillet3_piece_4 = extrude(amount=11.815359185, mode=Mode.PRIVATE)
    fillet3_piece_4 = split(fillet3_piece_4, bisect_by=Plane(origin=(-5.831638777, 29.468233552, 0.616132314), z_dir=(0, 0.7570343753275034, 0.653375048936288)), keep=Keep.TOP, mode=Mode.PRIVATE)
    add(fillet3_piece_4, mode=Mode.SUBTRACT)

    # Sketch19 → Cut-Extrude17 (cut, two sides: drawn at the far end of the back side and taken through both)
    with BuildSketch(Plane.XY.offset(5).offset(-CUT_EXTRUDE17_DEPTH_BACK)):
        with Locations((12.571988995, 20.723484304)):
            Rectangle(SKETCH19_W, SKETCH19_H)
    extrude(amount=CUT_EXTRUDE17_DEPTH + CUT_EXTRUDE17_DEPTH_BACK, mode=Mode.SUBTRACT)

    # Sketch20 → Cut-Extrude18 (cut)
    with BuildSketch(Plane(origin=(3.5, 0, 0), x_dir=(0, 0, -1), z_dir=(1, 0, 0))):
        with Locations(Location((0, 20.3, 0), (0, 0, 90))):
            Circle(SKETCH20_R)
    extrude(amount=-CUT_EXTRUDE18_DEPTH, mode=Mode.SUBTRACT)

    # Sketch21 → Cut-Extrude19 (cut)
    with BuildSketch(Plane(origin=(1.4, 0, 0), x_dir=(0, 0, -1), z_dir=(1, 0, 0))):
        with Locations(Location((0, 20.3, 0), (0, 0, 90))):
            Circle(SKETCH21_R)
    extrude(amount=-CUT_EXTRUDE19_DEPTH, mode=Mode.SUBTRACT)

    # Sketch17 → Cut-Extrude20 (cut, two sides: drawn at the far end of the back side and taken through both)
    with BuildSketch(Plane.XY.offset(-CUT_EXTRUDE20_DEPTH_BACK)):
        with BuildLine():
            Line((11, 0), (21.82042967, 52.006672347))
            Line((21.82042967, 52.006672347), (-19.981455648, 54.836748038))
            Line((-19.981455648, 54.836748038), (-22.103338511, 10.056999989))
            Line((-22.103338511, 10.056999989), (-11, 0))
            ThreePointArc((-11, 0), (-9.292734081, 20), (-11, 40))
            Line((-11, 40), (-14.776436098, 42.476608752))
            Line((-14.776436098, 42.476608752), (-7.177261686, 49.84322342))
            Line((-7.177261686, 49.84322342), (9.09969288, 46.456664847))
            Line((9.09969288, 46.456664847), (16.101427872, 37.54860329))
            Line((16.101427872, 37.54860329), (11, 40))
            ThreePointArc((11, 40), (9.292734081, 20), (11, 0))
        make_face()
    extrude(amount=CUT_EXTRUDE20_DEPTH + CUT_EXTRUDE20_DEPTH_BACK, mode=Mode.SUBTRACT)


solid = part.part
